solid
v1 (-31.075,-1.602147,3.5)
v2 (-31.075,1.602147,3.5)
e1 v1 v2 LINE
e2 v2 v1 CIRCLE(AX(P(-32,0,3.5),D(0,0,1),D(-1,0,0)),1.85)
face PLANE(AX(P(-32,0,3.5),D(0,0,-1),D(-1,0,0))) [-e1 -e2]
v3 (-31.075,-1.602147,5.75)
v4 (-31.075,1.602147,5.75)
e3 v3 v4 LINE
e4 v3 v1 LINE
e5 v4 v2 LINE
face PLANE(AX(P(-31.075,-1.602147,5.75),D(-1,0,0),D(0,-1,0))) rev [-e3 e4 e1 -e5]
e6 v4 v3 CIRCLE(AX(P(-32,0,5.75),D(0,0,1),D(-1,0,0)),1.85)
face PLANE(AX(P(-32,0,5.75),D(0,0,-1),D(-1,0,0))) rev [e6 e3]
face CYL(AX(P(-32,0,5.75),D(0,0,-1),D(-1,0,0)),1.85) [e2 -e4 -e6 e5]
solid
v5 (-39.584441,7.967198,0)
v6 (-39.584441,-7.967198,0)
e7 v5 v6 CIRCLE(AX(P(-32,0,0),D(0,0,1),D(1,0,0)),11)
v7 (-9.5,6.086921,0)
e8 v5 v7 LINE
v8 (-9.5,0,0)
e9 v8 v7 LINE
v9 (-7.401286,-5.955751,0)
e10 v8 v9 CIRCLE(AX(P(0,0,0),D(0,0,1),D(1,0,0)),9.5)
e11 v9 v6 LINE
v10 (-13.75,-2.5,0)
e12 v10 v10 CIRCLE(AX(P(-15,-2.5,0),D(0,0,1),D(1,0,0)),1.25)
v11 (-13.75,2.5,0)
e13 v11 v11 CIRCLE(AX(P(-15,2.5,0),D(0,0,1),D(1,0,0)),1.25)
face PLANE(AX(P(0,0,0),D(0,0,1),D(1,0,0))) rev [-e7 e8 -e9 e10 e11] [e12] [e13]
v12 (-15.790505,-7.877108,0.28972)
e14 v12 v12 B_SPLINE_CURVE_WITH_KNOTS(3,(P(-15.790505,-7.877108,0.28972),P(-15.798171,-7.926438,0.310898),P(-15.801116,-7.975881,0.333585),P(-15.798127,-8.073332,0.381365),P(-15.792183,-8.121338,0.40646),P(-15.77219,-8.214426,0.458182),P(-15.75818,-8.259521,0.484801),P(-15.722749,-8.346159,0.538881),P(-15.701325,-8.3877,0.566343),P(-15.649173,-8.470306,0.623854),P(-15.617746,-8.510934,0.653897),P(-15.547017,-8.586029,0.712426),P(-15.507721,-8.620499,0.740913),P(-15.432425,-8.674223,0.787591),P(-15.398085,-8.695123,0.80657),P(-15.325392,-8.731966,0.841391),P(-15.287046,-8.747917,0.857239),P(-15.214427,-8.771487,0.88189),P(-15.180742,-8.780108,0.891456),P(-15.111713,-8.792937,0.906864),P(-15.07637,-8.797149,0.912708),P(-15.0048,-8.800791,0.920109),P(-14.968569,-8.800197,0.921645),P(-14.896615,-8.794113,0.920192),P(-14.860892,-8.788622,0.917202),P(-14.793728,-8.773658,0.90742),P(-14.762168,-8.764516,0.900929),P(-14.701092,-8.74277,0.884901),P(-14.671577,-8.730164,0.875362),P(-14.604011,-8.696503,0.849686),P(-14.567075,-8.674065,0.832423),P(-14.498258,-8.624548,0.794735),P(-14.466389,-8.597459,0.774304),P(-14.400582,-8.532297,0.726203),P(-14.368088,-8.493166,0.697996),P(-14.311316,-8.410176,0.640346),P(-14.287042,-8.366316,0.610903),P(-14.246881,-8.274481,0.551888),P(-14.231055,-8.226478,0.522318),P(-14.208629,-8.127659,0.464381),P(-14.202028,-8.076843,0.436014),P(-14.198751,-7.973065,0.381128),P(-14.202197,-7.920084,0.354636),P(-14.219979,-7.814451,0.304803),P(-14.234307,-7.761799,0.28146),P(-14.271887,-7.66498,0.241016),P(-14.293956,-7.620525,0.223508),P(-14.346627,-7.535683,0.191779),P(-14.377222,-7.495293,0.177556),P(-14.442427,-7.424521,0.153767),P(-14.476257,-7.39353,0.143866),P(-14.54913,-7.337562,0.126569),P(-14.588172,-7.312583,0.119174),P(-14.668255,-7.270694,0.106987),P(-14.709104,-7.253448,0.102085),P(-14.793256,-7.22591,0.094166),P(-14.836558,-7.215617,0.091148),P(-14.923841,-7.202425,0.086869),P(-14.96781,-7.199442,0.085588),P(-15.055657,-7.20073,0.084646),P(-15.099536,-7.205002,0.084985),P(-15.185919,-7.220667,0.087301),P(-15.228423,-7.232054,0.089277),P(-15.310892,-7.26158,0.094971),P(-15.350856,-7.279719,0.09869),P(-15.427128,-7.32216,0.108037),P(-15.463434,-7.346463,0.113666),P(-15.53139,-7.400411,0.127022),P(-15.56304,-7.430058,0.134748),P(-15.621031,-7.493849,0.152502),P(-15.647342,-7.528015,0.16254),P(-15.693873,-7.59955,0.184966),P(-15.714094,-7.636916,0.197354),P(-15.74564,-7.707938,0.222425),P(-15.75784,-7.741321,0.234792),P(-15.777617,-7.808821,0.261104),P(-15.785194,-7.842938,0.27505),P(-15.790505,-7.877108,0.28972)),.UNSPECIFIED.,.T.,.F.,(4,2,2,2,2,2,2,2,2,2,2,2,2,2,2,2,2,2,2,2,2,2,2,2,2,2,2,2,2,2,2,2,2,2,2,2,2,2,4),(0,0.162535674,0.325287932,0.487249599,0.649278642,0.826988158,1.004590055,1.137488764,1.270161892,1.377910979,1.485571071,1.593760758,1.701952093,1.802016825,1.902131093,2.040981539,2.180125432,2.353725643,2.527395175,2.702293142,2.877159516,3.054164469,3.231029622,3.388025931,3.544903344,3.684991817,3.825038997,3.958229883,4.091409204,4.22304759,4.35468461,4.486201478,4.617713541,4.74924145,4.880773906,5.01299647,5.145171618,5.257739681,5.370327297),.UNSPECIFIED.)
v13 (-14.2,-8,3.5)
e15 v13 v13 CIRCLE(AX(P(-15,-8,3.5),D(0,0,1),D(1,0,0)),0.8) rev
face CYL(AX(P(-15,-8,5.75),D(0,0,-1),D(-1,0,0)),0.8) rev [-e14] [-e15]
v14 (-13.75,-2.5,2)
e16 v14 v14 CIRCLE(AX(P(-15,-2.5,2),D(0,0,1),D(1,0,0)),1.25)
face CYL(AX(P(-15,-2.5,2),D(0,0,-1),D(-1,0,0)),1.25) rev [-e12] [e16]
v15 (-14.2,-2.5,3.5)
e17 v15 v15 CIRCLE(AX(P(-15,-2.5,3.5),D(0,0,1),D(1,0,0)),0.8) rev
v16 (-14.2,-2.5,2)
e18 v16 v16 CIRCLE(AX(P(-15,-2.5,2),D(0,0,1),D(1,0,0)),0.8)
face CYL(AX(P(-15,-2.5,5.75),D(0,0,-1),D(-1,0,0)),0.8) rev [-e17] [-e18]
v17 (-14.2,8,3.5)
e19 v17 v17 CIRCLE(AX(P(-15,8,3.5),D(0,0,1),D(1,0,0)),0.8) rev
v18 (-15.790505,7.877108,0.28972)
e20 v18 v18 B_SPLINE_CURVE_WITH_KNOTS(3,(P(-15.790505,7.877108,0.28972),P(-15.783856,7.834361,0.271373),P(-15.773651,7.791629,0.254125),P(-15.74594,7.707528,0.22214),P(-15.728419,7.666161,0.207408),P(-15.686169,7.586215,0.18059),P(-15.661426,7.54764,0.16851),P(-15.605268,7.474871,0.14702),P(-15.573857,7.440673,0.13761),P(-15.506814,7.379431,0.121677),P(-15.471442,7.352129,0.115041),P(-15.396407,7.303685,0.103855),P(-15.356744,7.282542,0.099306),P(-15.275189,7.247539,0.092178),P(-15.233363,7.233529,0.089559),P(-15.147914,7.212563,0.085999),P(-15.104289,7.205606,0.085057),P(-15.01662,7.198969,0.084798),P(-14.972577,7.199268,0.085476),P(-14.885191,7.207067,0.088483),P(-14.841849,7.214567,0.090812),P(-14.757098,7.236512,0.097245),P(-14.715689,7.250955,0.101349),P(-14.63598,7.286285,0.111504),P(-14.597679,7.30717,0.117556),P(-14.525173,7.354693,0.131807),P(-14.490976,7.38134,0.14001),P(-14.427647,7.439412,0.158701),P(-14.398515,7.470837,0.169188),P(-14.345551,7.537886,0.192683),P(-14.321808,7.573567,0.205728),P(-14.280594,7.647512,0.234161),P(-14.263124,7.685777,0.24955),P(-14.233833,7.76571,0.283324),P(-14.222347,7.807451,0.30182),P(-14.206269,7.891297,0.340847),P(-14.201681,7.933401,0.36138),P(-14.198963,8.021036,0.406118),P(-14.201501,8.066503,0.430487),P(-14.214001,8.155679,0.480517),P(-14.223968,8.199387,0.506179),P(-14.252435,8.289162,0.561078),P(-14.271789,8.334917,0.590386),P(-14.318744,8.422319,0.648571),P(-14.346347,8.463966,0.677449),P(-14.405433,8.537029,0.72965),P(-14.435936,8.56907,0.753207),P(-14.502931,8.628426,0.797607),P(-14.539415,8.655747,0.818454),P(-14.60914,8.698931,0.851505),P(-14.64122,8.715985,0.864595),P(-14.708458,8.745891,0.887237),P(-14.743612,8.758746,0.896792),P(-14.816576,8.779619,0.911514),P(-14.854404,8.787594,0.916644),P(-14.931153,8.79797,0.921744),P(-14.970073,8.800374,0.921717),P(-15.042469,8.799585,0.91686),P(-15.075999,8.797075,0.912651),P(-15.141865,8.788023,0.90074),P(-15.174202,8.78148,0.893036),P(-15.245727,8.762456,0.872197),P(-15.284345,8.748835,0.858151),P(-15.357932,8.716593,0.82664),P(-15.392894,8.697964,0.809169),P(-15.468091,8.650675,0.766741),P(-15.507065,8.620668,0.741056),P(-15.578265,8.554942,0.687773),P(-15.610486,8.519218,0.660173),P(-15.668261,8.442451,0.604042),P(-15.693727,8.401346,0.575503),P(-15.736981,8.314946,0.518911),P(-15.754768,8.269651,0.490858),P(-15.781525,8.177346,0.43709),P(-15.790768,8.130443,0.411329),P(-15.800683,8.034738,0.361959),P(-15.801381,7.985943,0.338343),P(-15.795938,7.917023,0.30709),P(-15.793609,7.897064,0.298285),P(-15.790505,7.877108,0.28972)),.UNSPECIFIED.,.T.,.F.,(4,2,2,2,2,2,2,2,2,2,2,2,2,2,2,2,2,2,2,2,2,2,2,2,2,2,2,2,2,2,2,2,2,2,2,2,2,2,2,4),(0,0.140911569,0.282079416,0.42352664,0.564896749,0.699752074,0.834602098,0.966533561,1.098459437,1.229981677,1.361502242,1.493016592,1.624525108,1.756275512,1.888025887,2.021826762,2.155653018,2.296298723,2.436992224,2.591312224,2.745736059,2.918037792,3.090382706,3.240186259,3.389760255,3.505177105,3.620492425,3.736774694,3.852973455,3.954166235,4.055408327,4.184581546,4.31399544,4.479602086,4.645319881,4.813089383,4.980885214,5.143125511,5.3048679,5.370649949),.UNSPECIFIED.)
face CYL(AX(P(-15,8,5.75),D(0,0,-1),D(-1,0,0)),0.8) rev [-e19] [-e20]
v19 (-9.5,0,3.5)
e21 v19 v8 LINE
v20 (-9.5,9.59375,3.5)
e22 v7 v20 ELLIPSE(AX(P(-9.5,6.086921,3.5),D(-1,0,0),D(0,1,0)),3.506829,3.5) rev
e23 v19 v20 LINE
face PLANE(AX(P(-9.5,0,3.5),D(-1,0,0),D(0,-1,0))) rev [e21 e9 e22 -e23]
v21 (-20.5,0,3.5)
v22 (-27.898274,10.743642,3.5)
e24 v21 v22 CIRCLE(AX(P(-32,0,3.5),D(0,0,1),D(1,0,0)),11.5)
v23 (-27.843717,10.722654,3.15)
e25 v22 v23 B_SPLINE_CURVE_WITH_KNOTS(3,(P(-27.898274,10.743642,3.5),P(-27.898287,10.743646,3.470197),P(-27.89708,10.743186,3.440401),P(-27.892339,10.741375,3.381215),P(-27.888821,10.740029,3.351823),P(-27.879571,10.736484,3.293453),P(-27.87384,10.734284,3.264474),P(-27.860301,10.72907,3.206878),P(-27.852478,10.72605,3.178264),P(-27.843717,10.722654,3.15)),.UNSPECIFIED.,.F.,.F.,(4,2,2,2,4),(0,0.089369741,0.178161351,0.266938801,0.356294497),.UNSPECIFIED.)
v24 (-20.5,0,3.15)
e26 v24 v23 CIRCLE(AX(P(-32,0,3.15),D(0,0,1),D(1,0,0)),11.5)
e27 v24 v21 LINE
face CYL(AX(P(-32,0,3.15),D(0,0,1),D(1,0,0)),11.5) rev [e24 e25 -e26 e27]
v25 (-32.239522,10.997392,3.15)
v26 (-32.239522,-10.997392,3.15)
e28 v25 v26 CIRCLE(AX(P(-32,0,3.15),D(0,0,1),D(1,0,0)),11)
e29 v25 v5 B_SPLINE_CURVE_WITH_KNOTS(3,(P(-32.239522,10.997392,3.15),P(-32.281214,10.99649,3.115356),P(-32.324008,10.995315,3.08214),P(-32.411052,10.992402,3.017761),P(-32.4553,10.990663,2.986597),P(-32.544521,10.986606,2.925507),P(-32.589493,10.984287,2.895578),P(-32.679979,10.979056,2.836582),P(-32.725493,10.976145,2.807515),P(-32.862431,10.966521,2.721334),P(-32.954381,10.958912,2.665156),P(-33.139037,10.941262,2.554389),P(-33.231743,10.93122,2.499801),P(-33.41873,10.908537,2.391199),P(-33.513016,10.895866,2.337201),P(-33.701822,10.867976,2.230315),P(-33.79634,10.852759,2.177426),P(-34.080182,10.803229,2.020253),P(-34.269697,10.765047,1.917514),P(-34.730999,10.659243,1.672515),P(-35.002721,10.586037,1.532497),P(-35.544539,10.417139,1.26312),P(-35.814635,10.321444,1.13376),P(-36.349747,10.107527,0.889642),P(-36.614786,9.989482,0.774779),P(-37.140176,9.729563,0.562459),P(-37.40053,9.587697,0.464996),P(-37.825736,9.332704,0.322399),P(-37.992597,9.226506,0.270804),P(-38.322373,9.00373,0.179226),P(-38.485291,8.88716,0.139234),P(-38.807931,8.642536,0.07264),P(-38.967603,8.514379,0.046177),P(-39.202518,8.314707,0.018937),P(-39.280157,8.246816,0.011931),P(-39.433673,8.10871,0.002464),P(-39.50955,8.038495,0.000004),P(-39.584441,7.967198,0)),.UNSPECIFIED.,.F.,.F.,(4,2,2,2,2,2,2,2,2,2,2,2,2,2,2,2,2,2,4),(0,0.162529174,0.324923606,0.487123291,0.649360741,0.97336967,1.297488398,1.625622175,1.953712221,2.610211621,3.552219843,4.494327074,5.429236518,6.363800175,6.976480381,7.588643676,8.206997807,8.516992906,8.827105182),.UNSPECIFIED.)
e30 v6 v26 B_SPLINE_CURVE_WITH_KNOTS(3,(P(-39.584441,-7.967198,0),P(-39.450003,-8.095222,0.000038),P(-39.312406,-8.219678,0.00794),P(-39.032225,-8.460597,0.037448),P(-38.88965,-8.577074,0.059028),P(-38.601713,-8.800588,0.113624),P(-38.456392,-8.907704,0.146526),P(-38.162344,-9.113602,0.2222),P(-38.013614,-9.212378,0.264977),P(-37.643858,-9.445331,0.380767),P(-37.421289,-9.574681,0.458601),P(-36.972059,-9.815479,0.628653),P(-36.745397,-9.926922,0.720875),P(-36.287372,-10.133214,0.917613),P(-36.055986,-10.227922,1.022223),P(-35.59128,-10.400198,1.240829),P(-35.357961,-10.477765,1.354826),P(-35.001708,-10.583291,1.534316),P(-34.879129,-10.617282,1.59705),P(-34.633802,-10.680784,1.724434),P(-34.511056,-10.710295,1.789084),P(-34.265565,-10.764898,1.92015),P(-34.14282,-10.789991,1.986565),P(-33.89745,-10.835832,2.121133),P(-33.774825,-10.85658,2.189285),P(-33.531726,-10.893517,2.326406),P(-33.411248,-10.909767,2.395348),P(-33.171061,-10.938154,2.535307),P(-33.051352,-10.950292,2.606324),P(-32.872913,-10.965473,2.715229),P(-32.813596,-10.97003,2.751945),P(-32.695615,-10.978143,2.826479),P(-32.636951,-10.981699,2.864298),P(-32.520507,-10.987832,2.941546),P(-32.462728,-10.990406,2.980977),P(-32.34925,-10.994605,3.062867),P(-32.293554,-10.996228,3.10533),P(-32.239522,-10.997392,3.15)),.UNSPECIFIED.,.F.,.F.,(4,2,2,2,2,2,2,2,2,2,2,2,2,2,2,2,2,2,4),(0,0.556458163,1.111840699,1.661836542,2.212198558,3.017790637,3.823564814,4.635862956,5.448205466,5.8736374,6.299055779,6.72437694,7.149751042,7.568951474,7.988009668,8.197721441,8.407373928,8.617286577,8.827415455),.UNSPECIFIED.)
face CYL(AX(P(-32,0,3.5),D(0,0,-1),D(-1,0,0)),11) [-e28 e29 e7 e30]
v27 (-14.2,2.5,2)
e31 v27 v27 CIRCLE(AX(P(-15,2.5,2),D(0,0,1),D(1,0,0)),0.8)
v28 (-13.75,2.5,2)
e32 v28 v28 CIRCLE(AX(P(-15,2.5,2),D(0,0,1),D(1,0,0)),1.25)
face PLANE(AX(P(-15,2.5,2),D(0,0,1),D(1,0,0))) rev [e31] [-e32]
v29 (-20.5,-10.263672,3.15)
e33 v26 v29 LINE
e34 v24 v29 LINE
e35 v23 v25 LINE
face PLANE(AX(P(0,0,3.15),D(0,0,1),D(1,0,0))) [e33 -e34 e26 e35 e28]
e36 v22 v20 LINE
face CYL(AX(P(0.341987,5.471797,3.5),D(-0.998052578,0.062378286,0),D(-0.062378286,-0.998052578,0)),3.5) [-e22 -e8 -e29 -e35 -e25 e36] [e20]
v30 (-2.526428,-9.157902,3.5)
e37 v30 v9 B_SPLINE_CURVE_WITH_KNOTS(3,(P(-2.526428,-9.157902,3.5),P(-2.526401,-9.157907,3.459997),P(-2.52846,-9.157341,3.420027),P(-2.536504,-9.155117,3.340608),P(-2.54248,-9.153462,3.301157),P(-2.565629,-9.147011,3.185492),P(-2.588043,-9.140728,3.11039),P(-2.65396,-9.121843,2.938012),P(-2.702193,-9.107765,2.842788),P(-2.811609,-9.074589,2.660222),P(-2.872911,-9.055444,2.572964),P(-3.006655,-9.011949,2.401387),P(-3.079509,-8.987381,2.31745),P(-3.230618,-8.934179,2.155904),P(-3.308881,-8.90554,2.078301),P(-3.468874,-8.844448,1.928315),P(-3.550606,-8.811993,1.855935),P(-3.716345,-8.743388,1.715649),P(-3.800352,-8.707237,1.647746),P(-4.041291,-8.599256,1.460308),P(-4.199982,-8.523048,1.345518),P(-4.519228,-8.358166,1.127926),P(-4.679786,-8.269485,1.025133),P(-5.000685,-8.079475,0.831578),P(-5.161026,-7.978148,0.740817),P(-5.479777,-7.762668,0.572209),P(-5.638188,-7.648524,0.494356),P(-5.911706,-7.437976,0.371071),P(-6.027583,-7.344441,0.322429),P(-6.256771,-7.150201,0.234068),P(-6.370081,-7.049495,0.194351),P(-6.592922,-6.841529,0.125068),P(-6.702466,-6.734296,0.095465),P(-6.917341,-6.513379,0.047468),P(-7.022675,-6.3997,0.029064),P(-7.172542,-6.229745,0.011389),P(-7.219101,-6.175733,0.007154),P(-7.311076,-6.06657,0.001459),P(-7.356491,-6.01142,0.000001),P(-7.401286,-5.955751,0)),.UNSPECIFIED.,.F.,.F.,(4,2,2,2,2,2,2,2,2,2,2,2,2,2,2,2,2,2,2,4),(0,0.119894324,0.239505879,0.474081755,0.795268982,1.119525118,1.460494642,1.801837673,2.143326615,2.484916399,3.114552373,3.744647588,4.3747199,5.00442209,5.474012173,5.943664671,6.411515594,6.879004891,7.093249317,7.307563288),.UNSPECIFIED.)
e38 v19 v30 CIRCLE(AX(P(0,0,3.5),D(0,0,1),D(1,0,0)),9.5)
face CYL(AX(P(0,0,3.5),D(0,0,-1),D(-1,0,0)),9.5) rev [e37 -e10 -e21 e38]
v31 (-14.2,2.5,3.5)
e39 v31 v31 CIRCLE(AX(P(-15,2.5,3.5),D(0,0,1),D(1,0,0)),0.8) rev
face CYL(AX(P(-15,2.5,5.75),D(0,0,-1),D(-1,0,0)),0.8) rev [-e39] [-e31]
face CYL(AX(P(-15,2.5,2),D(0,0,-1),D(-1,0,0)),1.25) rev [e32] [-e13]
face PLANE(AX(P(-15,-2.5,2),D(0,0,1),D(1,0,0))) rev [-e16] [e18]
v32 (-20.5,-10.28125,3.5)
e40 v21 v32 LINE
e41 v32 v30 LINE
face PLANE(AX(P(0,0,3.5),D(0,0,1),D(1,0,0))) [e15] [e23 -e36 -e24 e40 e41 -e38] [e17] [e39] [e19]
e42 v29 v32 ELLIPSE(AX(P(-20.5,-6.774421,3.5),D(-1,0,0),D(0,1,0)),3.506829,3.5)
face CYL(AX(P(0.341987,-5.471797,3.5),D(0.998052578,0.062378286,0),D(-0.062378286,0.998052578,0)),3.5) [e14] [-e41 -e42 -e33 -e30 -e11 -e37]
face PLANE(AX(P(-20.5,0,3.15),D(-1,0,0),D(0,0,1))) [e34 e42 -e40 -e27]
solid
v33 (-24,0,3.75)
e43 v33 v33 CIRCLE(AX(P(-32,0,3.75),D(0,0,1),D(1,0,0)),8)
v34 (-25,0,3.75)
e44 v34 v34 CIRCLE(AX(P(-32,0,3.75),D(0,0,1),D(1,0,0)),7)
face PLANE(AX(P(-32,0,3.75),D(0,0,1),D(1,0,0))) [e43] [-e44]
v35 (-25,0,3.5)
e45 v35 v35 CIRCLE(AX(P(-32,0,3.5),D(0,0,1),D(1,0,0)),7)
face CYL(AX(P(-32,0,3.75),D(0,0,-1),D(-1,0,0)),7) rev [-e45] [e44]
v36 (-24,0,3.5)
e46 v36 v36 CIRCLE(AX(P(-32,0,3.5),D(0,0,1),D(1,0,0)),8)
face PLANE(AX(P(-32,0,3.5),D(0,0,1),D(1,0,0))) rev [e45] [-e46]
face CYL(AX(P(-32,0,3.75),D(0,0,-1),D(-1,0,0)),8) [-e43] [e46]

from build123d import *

# Parameters (mm, degrees)
BOSS_EXTRUDE1_DEPTH = 3.5
JOINT_START         = 3.5
SKETCH7_R           = 11.5
JOINT_HOLE_DEPTH    = 0.35
POT_START           = 3.5
POT_INSERT_DEPTH    = 2.25
FRICTION_START      = 3.5
SKETCH4_R           = 8
SKETCH4_R_2         = 7
FRICTION_DEPTH      = 0.25
SKETCH2_R           = 0.8
SCREW_HOLES_DEPTH   = 45.755586244
SKETCH8_R           = 1.25
SCREW_HEADS_DEPTH   = 2
FILLET1_START       = -42.937682511
FILLET1_DEPTH       = 40.937682511
FILLET1_2_DEPTH     = 33.456183015


with BuildPart() as part:
    # Sketch1 → Boss-Extrude1 (new body)
    with BuildSketch(Plane.XY):
        with BuildLine():
            ThreePointArc((-2.526427532, -9.157901721), (-7.558143342, -5.755386106), (-9.5, 0))
            Line((-9.5, 0), (-9.5, 9.59375))
            Line((-9.5, 9.59375), (-32, 11))
            ThreePointArc((-32, 11), (-43, 0), (-32, -11))
            Line((-32, -11), (-2.526427532, -9.157901721))
        make_face()
    extrude(amount=BOSS_EXTRUDE1_DEPTH)

    # Sketch7 → Joint Hole (cut)
    with BuildSketch(Plane.XY.offset(JOINT_START)):
        with Locations((-32, 0)):
            Circle(SKETCH7_R)
        with BuildLine():
            Line((-20.5, -11.5), (-20.5, 0))
            ThreePointArc((-20.5, 0), (-23.868272016, -8.131727984), (-32, -11.5))
            Line((-32, -11.5), (-20.5, -11.5))
        make_face()
    extrude(amount=-JOINT_HOLE_DEPTH, mode=Mode.SUBTRACT)

    # Sketch2 → Screw Holes (cut, through all)
    with BuildSketch(Plane.XY):
        with Locations((-15, 8)):
            Circle(SKETCH2_R)
        with Locations((-15, -8)):
            Circle(SKETCH2_R)
        with Locations((-15, 2.5)):
            Circle(SKETCH2_R)
        with Locations((-15, -2.5)):
            Circle(SKETCH2_R)
    extrude(amount=SCREW_HOLES_DEPTH, mode=Mode.SUBTRACT)

    # Sketch8 → Screw Heads (cut)
    with BuildSketch(Plane.XY):
        with Locations((-15, 2.5)):
            Circle(SKETCH8_R)
        with Locations((-15, -2.5)):
            Circle(SKETCH8_R)
    extrude(amount=SCREW_HEADS_DEPTH, mode=Mode.SUBTRACT)

    # Fillet1: read off the stored shape, not the designer's step
    # Fillet1 outline → Fillet1 (cut)
    with BuildSketch(Plane(origin=(0, 0, 0), x_dir=(-0.062378286155180485, 0.9980525784828886, 0), z_dir=(0.9980525784828886, 0.06237828615518048, 0)).offset(FILLET1_START)):
        with BuildLine():
            ThreePointArc((-5.482473206, 0), (-7.95734694, 1.025126266), (-8.982473206, 3.5))
            Line((-8.982473206, 3.5), (-8.982473206, 0))
            Line((-8.982473206, 0), (-5.482473206, 0))
        make_face()
    extrude(amount=FILLET1_DEPTH, mode=Mode.SUBTRACT)

    # Fillet1 2 outline → Fillet1 2 (cut)
    with BuildSketch(Plane(origin=(0, 0, 0), x_dir=(0.062378286155180485, 0.9980525784828886, 0), z_dir=(0.9980525784828886, -0.06237828615518048, 0)).offset(FILLET1_START)):
        with BuildLine():
            Line((8.982473206, 0), (8.982473206, 3.5))
            ThreePointArc((8.982473206, 3.5), (7.95734694, 1.025126266), (5.482473206, 0))
            Line((5.482473206, 0), (8.982473206, 0))
        make_face()
    extrude(amount=FILLET1_2_DEPTH, mode=Mode.SUBTRACT)


with BuildPart() as body_2:
    # Sketch5 → Pot Insert (new body)
    with BuildSketch(Plane.XY.offset(POT_START)):
        with BuildLine():
            Line((-31.075, -1.602146997), (-31.075, 1.602146997))
            ThreePointArc((-31.075, 1.602146997), (-33.85, 0), (-31.075, -1.602146997))
        make_face()
    extrude(amount=POT_INSERT_DEPTH)


with BuildPart() as body_3:
    # Sketch4 → Friction (new body)
    with BuildSketch(Plane.XY.offset(FRICTION_START)):
        with Locations((-32, 0)):
            Circle(SKETCH4_R)
        with Locations((-32, 0)):
            Circle(SKETCH4_R_2, mode=Mode.SUBTRACT)
    extrude(amount=FRICTION_DEPTH)


solid = Compound([part.part, body_2.part, body_3.part])
